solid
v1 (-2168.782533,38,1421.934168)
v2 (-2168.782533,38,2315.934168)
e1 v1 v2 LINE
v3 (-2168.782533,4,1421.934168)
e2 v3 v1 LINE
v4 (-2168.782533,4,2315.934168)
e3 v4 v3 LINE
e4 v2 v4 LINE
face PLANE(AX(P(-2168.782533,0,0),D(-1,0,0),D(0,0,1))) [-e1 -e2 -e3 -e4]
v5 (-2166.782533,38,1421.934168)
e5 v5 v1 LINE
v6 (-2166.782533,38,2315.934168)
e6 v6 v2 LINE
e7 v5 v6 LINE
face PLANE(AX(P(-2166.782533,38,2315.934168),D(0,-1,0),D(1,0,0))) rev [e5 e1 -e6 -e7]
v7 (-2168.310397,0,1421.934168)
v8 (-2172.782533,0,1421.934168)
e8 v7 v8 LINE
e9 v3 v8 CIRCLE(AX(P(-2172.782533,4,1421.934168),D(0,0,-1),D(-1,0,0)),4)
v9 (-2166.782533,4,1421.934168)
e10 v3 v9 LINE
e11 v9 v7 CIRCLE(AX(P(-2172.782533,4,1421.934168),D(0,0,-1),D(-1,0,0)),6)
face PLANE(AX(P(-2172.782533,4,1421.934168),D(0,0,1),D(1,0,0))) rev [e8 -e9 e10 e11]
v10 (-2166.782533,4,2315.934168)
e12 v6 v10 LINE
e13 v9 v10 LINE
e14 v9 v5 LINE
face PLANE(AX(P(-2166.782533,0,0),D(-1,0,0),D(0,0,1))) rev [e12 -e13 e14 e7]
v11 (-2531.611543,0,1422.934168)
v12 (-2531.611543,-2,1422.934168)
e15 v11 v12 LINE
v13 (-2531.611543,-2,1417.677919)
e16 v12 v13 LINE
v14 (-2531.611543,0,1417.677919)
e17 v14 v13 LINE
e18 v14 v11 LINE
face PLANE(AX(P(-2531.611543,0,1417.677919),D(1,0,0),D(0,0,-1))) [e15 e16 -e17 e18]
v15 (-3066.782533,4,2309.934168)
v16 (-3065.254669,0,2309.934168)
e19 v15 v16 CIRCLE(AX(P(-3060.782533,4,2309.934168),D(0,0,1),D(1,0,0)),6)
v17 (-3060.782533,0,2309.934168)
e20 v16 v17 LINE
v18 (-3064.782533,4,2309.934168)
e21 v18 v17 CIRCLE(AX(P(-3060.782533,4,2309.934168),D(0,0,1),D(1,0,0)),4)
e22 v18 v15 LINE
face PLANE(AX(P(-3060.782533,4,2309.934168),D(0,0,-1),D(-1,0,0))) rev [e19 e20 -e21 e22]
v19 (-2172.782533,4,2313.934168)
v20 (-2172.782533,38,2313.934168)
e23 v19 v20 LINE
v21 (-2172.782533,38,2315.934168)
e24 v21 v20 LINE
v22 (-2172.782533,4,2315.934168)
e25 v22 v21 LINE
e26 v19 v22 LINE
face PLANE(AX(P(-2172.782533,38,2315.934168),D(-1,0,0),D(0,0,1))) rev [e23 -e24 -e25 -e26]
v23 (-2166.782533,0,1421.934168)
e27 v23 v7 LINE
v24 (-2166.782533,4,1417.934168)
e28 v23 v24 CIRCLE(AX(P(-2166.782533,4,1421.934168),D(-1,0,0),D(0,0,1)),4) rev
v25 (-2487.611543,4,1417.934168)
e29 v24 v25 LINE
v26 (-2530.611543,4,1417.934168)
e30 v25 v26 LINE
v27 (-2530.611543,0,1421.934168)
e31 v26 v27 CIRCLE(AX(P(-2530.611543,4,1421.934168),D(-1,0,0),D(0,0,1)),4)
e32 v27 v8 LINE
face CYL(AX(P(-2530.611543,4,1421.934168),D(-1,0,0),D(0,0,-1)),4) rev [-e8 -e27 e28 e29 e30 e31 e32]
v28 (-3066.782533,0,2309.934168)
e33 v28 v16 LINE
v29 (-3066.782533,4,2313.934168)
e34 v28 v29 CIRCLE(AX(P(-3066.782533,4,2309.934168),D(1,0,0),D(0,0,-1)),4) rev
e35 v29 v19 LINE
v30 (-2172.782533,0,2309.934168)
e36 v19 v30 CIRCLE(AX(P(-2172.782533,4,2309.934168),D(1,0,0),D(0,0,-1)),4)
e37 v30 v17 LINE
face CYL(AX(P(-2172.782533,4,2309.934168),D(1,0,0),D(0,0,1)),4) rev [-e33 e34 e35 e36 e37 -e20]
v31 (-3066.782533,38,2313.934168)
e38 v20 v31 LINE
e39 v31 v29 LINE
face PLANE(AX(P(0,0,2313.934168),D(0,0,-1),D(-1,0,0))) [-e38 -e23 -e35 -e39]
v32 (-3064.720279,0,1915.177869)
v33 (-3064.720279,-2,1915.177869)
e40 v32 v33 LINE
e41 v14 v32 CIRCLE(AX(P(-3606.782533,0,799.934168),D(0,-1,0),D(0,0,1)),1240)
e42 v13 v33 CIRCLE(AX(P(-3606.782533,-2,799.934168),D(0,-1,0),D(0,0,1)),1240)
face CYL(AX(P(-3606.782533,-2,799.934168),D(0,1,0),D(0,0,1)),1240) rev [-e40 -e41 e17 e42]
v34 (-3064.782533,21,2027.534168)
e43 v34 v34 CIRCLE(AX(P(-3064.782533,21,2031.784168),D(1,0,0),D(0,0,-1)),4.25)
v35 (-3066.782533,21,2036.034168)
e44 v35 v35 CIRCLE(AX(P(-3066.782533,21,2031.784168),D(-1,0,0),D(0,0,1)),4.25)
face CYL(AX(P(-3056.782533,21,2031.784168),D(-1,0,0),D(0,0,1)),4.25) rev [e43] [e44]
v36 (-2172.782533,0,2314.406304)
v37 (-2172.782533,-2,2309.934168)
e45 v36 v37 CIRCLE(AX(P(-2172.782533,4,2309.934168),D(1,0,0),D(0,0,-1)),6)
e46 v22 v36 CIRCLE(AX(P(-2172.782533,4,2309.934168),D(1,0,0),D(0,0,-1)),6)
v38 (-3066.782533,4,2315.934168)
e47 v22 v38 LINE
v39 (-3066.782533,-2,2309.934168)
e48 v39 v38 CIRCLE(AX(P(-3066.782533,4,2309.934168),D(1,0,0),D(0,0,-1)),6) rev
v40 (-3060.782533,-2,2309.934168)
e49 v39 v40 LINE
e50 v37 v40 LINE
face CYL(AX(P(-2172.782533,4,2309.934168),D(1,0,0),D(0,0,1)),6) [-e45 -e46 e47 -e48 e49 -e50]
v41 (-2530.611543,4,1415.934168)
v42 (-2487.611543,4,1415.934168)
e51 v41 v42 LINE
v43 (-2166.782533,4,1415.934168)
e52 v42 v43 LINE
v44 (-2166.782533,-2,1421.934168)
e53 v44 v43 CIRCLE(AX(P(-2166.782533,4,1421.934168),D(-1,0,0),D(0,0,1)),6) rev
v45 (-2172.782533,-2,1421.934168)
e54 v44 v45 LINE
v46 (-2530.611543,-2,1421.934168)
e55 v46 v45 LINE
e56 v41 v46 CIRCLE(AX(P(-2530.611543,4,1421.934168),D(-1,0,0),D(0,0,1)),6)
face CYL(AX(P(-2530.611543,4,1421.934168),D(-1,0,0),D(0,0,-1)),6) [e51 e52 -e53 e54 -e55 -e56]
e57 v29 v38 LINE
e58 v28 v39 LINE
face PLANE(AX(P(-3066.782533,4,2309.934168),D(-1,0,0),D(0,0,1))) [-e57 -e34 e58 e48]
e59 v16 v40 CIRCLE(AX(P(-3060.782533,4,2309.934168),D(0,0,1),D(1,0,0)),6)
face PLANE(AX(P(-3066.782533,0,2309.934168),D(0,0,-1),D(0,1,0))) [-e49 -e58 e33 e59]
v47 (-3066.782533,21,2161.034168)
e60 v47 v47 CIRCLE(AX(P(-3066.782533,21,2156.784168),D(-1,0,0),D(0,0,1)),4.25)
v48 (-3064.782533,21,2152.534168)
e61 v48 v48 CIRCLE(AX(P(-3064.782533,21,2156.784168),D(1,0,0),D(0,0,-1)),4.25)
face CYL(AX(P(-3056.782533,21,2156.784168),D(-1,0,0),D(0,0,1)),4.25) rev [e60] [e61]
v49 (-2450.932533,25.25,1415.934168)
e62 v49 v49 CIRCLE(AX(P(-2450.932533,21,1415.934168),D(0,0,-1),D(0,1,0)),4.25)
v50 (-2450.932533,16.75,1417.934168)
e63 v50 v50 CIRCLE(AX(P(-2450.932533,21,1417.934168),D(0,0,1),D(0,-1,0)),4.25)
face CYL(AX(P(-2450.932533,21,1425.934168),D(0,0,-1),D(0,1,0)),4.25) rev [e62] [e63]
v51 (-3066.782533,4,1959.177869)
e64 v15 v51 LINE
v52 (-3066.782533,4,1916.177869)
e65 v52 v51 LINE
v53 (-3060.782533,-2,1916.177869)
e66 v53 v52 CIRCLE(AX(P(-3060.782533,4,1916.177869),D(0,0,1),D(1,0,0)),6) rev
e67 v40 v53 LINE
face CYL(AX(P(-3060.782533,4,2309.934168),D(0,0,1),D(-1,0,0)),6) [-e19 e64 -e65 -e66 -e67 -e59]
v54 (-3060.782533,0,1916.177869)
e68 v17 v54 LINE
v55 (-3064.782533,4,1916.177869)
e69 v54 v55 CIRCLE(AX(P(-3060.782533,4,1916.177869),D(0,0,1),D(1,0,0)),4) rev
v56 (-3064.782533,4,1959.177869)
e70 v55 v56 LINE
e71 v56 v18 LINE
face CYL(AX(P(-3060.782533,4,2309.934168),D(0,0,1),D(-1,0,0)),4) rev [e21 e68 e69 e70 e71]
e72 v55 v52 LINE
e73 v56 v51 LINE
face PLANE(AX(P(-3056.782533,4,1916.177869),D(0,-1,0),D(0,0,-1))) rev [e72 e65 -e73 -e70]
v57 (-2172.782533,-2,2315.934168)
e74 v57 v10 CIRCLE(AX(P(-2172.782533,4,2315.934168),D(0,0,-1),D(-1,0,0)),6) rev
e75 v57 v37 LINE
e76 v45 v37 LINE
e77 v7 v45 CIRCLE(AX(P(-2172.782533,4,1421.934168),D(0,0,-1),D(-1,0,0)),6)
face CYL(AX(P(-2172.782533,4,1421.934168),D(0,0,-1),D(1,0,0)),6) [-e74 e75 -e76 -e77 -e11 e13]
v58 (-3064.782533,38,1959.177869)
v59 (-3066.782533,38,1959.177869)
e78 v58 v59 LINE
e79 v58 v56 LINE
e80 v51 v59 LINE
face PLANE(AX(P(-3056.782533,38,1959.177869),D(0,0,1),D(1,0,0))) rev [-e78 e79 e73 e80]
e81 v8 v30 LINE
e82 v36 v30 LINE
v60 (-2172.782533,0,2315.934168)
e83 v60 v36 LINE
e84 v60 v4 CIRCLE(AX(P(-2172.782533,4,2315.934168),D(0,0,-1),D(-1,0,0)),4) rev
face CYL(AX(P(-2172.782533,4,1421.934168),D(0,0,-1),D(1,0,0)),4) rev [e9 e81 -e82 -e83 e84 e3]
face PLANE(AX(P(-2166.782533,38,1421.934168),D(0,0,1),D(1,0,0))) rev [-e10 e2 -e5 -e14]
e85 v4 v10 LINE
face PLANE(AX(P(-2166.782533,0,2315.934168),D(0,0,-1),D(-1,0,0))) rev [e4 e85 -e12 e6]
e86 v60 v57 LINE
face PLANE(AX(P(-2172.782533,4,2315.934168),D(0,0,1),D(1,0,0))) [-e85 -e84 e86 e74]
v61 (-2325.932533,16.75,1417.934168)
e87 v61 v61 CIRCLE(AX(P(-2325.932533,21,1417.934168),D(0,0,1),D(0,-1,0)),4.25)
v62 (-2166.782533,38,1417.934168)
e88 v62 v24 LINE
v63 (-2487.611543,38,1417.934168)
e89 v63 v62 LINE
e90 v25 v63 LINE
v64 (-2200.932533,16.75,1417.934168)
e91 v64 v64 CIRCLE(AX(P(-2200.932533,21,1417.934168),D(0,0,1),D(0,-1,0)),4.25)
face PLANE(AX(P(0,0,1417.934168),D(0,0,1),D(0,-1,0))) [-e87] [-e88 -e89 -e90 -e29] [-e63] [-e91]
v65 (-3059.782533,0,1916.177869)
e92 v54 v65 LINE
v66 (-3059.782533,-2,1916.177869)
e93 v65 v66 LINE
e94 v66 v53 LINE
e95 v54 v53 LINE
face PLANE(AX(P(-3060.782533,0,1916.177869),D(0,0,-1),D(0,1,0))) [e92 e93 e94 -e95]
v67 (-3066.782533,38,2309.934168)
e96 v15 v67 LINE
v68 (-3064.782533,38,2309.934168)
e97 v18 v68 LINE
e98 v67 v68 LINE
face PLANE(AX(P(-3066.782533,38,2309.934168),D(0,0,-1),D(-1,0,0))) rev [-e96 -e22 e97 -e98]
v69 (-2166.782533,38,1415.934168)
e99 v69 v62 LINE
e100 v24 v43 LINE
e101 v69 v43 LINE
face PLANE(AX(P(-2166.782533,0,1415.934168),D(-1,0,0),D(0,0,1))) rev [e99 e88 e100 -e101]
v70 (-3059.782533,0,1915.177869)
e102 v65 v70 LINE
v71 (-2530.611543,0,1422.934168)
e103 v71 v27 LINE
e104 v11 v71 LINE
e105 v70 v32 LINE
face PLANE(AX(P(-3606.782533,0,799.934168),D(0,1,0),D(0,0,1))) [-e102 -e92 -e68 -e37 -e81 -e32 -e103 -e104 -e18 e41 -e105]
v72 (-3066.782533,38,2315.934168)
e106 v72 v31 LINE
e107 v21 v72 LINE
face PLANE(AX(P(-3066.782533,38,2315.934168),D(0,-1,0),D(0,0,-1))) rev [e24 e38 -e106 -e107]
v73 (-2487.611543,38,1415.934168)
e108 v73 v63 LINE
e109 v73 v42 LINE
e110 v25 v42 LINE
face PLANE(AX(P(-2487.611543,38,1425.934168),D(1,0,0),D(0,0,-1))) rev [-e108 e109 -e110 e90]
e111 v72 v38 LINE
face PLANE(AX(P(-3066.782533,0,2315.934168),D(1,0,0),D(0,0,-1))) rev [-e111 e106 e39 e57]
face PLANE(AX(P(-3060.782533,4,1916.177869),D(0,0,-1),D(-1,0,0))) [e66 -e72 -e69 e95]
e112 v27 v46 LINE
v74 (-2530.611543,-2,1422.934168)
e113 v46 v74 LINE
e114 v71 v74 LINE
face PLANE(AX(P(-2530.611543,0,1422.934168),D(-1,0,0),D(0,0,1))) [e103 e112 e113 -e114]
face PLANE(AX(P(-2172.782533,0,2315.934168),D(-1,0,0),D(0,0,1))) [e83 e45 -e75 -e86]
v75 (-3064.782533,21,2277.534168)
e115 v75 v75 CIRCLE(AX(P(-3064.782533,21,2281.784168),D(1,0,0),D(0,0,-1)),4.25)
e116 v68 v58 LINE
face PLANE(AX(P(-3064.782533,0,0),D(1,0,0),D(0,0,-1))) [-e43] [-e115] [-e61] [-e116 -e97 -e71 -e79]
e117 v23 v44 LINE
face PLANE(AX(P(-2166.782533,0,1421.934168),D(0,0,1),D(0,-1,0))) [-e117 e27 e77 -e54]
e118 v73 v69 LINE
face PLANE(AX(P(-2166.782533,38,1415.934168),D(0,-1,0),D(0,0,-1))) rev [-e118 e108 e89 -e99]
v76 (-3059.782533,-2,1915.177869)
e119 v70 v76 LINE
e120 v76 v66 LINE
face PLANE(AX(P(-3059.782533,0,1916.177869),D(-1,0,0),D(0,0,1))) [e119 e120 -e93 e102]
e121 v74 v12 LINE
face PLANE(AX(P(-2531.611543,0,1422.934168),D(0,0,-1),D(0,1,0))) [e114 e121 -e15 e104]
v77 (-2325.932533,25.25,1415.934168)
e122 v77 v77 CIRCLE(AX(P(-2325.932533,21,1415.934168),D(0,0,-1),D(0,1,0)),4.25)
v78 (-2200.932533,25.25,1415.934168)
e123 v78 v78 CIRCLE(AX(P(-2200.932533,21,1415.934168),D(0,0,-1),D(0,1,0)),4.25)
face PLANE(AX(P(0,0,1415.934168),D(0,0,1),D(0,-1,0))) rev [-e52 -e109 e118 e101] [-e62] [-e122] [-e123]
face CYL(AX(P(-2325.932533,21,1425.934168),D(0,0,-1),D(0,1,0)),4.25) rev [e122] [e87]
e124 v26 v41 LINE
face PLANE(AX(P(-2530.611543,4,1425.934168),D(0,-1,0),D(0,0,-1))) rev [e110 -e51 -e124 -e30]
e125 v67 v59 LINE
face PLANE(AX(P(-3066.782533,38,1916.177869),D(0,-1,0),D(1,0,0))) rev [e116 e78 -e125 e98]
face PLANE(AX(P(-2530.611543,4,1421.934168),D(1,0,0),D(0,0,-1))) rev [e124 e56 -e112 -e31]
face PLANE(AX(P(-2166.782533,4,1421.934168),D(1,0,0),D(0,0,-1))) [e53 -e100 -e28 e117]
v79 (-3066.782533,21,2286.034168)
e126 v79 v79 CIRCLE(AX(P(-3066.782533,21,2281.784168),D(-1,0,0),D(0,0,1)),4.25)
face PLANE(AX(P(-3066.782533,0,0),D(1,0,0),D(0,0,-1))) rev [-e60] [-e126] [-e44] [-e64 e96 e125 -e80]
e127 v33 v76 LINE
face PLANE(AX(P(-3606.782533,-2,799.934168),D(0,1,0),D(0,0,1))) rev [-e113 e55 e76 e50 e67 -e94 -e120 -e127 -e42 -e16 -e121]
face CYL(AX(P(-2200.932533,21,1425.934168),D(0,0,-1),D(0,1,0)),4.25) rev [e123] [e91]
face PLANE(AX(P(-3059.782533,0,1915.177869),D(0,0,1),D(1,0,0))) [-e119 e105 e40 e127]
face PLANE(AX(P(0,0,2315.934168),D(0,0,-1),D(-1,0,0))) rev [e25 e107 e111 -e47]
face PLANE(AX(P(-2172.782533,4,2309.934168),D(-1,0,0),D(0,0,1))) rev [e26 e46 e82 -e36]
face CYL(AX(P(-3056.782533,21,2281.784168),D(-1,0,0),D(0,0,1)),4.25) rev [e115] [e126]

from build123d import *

# Parameters (mm, degrees)
BASE_FLANGE1_DEPTH            = 2
EDGE_FLANGE1_STRIP_W          = 16
EDGE_FLANGE1_STRIP_H          = 2
EDGE_FLANGE1_STRIP_CUT_DEPTH  = 363.829009869
EDGE_FLANGE1_RELIEF_W         = 17
EDGE_FLANGE1_RELIEF_H         = 1
EDGE_FLANGE1_RELIEF_CUT_DEPTH = 2
EDGE_FLANGE1_DEPTH            = 363.829009869
EDGE_FLANGE2_STRIP_W          = 16
EDGE_FLANGE2_STRIP_H          = 2
EDGE_FLANGE2_STRIP_CUT_DEPTH  = 894
EDGE_FLANGE2_DEPTH            = 894
EDGE_FLANGE3_STRIP_W          = 16
EDGE_FLANGE3_STRIP_H          = 2
EDGE_FLANGE3_STRIP_CUT_DEPTH  = 894
EDGE_FLANGE3_DEPTH            = 894
EDGE_FLANGE4_START            = 1915.177869048
EDGE_FLANGE4_DEPTH            = 394.75629901
EDGE_FLANGE4_2_DEPTH          = 1
EDGE_FLANGE4_START_2          = 1916.177869048
EDGE_FLANGE4_3_DEPTH          = 393.75629901
SKETCH20_W                    = 43
SKETCH20_H                    = 34
CUT_EXTRUDE1_DEPTH            = 10
SKETCH21_W                    = 43
SKETCH21_H                    = 34
CUT_EXTRUDE2_DEPTH            = 10
SKETCH22_R                    = 4.25
CUT_EXTRUDE3_DEPTH            = 10
SKETCH23_R                    = 4.25
CUT_EXTRUDE4_DEPTH            = 10


# Read off the part's stored shape, not the designer's step: Edge-Flange4
# Sheet-metal steps are written as plain solids
with BuildPart() as part:
    # Sketch1 → Base-Flange1 (new body)
    with BuildSketch(Plane(origin=(0, 0, 0), x_dir=(1, 0, 0), z_dir=(0, 1, 0))):
        with BuildLine():
            Line((-2530.611542613, -1415.934168058), (-2166.782532744, -1415.934168058))
            Line((-2166.782532744, -1415.934168058), (-2166.782532744, -2315.934168058))
            Line((-2166.782532744, -2315.934168058), (-3066.782532744, -2315.934168058))
            Line((-3066.782532744, -2315.934168058), (-3066.782532744, -1916.177869048))
            ThreePointArc((-3066.782532744, -1916.177869048), (-2760.872899609, -1706.596670078), (-2530.611542613, -1415.934168058))
        make_face()
    extrude(amount=-BASE_FLANGE1_DEPTH)

    # Edge-Flange1 strip (across the edge) → Edge-Flange1 strip cut (cut)
    with BuildSketch(Plane(origin=(-2166.782532744, 0, 1415.934168058), x_dir=(0, 0, 1), z_dir=(-1, 0, 0))):
        with Locations((-2, -1)):
            Rectangle(EDGE_FLANGE1_STRIP_W, EDGE_FLANGE1_STRIP_H)
    extrude(amount=EDGE_FLANGE1_STRIP_CUT_DEPTH, mode=Mode.SUBTRACT)

    # Edge-Flange1 relief (on the sheet) → Edge-Flange1 relief cut (cut)
    with BuildSketch(Plane(origin=(-2166.782532744, 0, 1421.934168058), x_dir=(0, 0, 1), z_dir=(0, 1, 0))):
        with Locations((-7.5, -364.329009869)):
            Rectangle(EDGE_FLANGE1_RELIEF_W, EDGE_FLANGE1_RELIEF_H)
    extrude(amount=-EDGE_FLANGE1_RELIEF_CUT_DEPTH, mode=Mode.SUBTRACT)

    # Edge-Flange1 section (across the edge) → Edge-Flange1 (add)
    with BuildSketch(Plane(origin=(-2166.782532744, 0, 1415.934168058), x_dir=(0, 0, 1), z_dir=(-1, 0, 0))):
        with BuildLine():
            Line((0, 4), (0, 38))
            Line((0, 38), (2, 38))
            Line((2, 38), (2, 4))
            ThreePointArc((2, 4), (3.171572875, 1.171572875), (6, 0))
            Line((6, 0), (6, -2))
            ThreePointArc((6, -2), (1.757359313, -0.242640687), (0, 4))
        make_face()
    extrude(amount=EDGE_FLANGE1_DEPTH)

    # Edge-Flange2 strip (across the edge) → Edge-Flange2 strip cut (cut)
    with BuildSketch(Plane(origin=(-2166.782532744, 0, 2315.934168058), x_dir=(-1, 0, 0), z_dir=(0, 0, -1))):
        with Locations((-2, -1)):
            Rectangle(EDGE_FLANGE2_STRIP_W, EDGE_FLANGE2_STRIP_H)
    extrude(amount=EDGE_FLANGE2_STRIP_CUT_DEPTH, mode=Mode.SUBTRACT)

    # Edge-Flange2 section (across the edge) → Edge-Flange2 (add)
    with BuildSketch(Plane(origin=(-2166.782532744, 0, 2315.934168058), x_dir=(-1, 0, 0), z_dir=(0, 0, -1))):
        with BuildLine():
            Line((0, 4), (0, 38))
            Line((0, 38), (2, 38))
            Line((2, 38), (2, 4))
            ThreePointArc((2, 4), (3.171572875, 1.171572875), (6, 0))
            Line((6, 0), (6, -2))
            ThreePointArc((6, -2), (1.757359313, -0.242640687), (0, 4))
        make_face()
    extrude(amount=EDGE_FLANGE2_DEPTH)

    # Edge-Flange3 strip (across the edge) → Edge-Flange3 strip cut (cut)
    with BuildSketch(Plane(origin=(-3066.782532744, 0, 2315.934168058), x_dir=(0, 0, -1), z_dir=(1, 0, 0))):
        with Locations((-2, -1)):
            Rectangle(EDGE_FLANGE3_STRIP_W, EDGE_FLANGE3_STRIP_H)
    extrude(amount=EDGE_FLANGE3_STRIP_CUT_DEPTH, mode=Mode.SUBTRACT)

    # Edge-Flange3 section (across the edge) → Edge-Flange3 (add)
    with BuildSketch(Plane(origin=(-3066.782532744, 0, 2315.934168058), x_dir=(0, 0, -1), z_dir=(1, 0, 0))):
        with BuildLine():
            Line((0, 4), (0, 38))
            Line((0, 38), (2, 38))
            Line((2, 38), (2, 4))
            ThreePointArc((2, 4), (3.171572875, 1.171572875), (6, 0))
            Line((6, 0), (6, -2))
            ThreePointArc((6, -2), (1.757359313, -0.242640687), (0, 4))
        make_face()
    extrude(amount=EDGE_FLANGE3_DEPTH)

    # Edge-Flange4 outline → Edge-Flange4 (cut)
    with BuildSketch(Plane.XY.offset(EDGE_FLANGE4_START)):
        with BuildLine():
            ThreePointArc((-3060.782532744, -2), (-3063.232022487, -1.477225575), (-3065.254668699, 0))
            Line((-3065.254668699, 0), (-3066.782532744, 0))
            Line((-3066.782532744, 0), (-3066.782532744, -2))
            Line((-3066.782532744, -2), (-3060.782532744, -2))
        make_face()
    extrude(amount=EDGE_FLANGE4_DEPTH, mode=Mode.SUBTRACT)

    # Edge-Flange4 2 outline → Edge-Flange4 2 (cut)
    with BuildSketch(Plane.XY.offset(EDGE_FLANGE4_START)):
        with BuildLine():
            Line((-3059.782532744, 0), (-3065.254668699, 0))
            ThreePointArc((-3065.254668699, 0), (-3063.232022487, -1.477225575), (-3060.782532744, -2))
            Line((-3060.782532744, -2), (-3059.782532744, -2))
            Line((-3059.782532744, -2), (-3059.782532744, 0))
        make_face()
    extrude(amount=EDGE_FLANGE4_2_DEPTH, mode=Mode.SUBTRACT)

    # Edge-Flange4 3 outline → Edge-Flange4 3 (add)
    with BuildSketch(Plane.XY.offset(EDGE_FLANGE4_START_2)):
        with BuildLine():
            Line((-3064.782532744, 38), (-3066.782532744, 38))
            Line((-3066.782532744, 38), (-3066.782532744, 4))
            ThreePointArc((-3066.782532744, 4), (-3066.387566898, 1.859067461), (-3065.254668699, 0))
            Line((-3065.254668699, 0), (-3060.782532744, 0))
            ThreePointArc((-3060.782532744, 0), (-3063.610959869, 1.171572875), (-3064.782532744, 4))
            Line((-3064.782532744, 4), (-3064.782532744, 38))
        make_face()
    extrude(amount=EDGE_FLANGE4_3_DEPTH)

    # Sketch20 → Cut-Extrude1 (cut)
    with BuildSketch(Plane.ZY.offset(3066.782532744)):
        with Locations((1937.677869048, 21)):
            Rectangle(SKETCH20_W, SKETCH20_H)
    extrude(amount=-CUT_EXTRUDE1_DEPTH, mode=Mode.SUBTRACT)

    # Sketch21 → Cut-Extrude2 (cut)
    with BuildSketch(Plane(origin=(0, 0, 1415.934168058), x_dir=(-1, 0, 0), z_dir=(0, 0, -1))):
        with Locations((2509.111542613, 21)):
            Rectangle(SKETCH21_W, SKETCH21_H)
    extrude(amount=-CUT_EXTRUDE2_DEPTH, mode=Mode.SUBTRACT)

    # Sketch22 → Cut-Extrude3 (cut)
    with BuildSketch(Plane(origin=(0, 0, 1415.934168058), x_dir=(-1, 0, 0), z_dir=(0, 0, -1))):
        with Locations(Location((2200.932532744, 21, 0), (0, 0, 90))):
            Circle(SKETCH22_R)
        with Locations(Location((2325.932532744, 21, 0), (0, 0, 90))):
            Circle(SKETCH22_R)
        with Locations(Location((2450.932532744, 21, 0), (0, 0, 90))):
            Circle(SKETCH22_R)
    extrude(amount=-CUT_EXTRUDE3_DEPTH, mode=Mode.SUBTRACT)

    # Sketch23 → Cut-Extrude4 (cut)
    with BuildSketch(Plane.ZY.offset(3066.782532744)):
        with Locations((2281.784168058, 21)):
            Circle(SKETCH23_R)
        with Locations((2156.784168058, 21)):
            Circle(SKETCH23_R)
        with Locations((2031.784168058, 21)):
            Circle(SKETCH23_R)
    extrude(amount=-CUT_EXTRUDE4_DEPTH, mode=Mode.SUBTRACT)


solid = part.part
